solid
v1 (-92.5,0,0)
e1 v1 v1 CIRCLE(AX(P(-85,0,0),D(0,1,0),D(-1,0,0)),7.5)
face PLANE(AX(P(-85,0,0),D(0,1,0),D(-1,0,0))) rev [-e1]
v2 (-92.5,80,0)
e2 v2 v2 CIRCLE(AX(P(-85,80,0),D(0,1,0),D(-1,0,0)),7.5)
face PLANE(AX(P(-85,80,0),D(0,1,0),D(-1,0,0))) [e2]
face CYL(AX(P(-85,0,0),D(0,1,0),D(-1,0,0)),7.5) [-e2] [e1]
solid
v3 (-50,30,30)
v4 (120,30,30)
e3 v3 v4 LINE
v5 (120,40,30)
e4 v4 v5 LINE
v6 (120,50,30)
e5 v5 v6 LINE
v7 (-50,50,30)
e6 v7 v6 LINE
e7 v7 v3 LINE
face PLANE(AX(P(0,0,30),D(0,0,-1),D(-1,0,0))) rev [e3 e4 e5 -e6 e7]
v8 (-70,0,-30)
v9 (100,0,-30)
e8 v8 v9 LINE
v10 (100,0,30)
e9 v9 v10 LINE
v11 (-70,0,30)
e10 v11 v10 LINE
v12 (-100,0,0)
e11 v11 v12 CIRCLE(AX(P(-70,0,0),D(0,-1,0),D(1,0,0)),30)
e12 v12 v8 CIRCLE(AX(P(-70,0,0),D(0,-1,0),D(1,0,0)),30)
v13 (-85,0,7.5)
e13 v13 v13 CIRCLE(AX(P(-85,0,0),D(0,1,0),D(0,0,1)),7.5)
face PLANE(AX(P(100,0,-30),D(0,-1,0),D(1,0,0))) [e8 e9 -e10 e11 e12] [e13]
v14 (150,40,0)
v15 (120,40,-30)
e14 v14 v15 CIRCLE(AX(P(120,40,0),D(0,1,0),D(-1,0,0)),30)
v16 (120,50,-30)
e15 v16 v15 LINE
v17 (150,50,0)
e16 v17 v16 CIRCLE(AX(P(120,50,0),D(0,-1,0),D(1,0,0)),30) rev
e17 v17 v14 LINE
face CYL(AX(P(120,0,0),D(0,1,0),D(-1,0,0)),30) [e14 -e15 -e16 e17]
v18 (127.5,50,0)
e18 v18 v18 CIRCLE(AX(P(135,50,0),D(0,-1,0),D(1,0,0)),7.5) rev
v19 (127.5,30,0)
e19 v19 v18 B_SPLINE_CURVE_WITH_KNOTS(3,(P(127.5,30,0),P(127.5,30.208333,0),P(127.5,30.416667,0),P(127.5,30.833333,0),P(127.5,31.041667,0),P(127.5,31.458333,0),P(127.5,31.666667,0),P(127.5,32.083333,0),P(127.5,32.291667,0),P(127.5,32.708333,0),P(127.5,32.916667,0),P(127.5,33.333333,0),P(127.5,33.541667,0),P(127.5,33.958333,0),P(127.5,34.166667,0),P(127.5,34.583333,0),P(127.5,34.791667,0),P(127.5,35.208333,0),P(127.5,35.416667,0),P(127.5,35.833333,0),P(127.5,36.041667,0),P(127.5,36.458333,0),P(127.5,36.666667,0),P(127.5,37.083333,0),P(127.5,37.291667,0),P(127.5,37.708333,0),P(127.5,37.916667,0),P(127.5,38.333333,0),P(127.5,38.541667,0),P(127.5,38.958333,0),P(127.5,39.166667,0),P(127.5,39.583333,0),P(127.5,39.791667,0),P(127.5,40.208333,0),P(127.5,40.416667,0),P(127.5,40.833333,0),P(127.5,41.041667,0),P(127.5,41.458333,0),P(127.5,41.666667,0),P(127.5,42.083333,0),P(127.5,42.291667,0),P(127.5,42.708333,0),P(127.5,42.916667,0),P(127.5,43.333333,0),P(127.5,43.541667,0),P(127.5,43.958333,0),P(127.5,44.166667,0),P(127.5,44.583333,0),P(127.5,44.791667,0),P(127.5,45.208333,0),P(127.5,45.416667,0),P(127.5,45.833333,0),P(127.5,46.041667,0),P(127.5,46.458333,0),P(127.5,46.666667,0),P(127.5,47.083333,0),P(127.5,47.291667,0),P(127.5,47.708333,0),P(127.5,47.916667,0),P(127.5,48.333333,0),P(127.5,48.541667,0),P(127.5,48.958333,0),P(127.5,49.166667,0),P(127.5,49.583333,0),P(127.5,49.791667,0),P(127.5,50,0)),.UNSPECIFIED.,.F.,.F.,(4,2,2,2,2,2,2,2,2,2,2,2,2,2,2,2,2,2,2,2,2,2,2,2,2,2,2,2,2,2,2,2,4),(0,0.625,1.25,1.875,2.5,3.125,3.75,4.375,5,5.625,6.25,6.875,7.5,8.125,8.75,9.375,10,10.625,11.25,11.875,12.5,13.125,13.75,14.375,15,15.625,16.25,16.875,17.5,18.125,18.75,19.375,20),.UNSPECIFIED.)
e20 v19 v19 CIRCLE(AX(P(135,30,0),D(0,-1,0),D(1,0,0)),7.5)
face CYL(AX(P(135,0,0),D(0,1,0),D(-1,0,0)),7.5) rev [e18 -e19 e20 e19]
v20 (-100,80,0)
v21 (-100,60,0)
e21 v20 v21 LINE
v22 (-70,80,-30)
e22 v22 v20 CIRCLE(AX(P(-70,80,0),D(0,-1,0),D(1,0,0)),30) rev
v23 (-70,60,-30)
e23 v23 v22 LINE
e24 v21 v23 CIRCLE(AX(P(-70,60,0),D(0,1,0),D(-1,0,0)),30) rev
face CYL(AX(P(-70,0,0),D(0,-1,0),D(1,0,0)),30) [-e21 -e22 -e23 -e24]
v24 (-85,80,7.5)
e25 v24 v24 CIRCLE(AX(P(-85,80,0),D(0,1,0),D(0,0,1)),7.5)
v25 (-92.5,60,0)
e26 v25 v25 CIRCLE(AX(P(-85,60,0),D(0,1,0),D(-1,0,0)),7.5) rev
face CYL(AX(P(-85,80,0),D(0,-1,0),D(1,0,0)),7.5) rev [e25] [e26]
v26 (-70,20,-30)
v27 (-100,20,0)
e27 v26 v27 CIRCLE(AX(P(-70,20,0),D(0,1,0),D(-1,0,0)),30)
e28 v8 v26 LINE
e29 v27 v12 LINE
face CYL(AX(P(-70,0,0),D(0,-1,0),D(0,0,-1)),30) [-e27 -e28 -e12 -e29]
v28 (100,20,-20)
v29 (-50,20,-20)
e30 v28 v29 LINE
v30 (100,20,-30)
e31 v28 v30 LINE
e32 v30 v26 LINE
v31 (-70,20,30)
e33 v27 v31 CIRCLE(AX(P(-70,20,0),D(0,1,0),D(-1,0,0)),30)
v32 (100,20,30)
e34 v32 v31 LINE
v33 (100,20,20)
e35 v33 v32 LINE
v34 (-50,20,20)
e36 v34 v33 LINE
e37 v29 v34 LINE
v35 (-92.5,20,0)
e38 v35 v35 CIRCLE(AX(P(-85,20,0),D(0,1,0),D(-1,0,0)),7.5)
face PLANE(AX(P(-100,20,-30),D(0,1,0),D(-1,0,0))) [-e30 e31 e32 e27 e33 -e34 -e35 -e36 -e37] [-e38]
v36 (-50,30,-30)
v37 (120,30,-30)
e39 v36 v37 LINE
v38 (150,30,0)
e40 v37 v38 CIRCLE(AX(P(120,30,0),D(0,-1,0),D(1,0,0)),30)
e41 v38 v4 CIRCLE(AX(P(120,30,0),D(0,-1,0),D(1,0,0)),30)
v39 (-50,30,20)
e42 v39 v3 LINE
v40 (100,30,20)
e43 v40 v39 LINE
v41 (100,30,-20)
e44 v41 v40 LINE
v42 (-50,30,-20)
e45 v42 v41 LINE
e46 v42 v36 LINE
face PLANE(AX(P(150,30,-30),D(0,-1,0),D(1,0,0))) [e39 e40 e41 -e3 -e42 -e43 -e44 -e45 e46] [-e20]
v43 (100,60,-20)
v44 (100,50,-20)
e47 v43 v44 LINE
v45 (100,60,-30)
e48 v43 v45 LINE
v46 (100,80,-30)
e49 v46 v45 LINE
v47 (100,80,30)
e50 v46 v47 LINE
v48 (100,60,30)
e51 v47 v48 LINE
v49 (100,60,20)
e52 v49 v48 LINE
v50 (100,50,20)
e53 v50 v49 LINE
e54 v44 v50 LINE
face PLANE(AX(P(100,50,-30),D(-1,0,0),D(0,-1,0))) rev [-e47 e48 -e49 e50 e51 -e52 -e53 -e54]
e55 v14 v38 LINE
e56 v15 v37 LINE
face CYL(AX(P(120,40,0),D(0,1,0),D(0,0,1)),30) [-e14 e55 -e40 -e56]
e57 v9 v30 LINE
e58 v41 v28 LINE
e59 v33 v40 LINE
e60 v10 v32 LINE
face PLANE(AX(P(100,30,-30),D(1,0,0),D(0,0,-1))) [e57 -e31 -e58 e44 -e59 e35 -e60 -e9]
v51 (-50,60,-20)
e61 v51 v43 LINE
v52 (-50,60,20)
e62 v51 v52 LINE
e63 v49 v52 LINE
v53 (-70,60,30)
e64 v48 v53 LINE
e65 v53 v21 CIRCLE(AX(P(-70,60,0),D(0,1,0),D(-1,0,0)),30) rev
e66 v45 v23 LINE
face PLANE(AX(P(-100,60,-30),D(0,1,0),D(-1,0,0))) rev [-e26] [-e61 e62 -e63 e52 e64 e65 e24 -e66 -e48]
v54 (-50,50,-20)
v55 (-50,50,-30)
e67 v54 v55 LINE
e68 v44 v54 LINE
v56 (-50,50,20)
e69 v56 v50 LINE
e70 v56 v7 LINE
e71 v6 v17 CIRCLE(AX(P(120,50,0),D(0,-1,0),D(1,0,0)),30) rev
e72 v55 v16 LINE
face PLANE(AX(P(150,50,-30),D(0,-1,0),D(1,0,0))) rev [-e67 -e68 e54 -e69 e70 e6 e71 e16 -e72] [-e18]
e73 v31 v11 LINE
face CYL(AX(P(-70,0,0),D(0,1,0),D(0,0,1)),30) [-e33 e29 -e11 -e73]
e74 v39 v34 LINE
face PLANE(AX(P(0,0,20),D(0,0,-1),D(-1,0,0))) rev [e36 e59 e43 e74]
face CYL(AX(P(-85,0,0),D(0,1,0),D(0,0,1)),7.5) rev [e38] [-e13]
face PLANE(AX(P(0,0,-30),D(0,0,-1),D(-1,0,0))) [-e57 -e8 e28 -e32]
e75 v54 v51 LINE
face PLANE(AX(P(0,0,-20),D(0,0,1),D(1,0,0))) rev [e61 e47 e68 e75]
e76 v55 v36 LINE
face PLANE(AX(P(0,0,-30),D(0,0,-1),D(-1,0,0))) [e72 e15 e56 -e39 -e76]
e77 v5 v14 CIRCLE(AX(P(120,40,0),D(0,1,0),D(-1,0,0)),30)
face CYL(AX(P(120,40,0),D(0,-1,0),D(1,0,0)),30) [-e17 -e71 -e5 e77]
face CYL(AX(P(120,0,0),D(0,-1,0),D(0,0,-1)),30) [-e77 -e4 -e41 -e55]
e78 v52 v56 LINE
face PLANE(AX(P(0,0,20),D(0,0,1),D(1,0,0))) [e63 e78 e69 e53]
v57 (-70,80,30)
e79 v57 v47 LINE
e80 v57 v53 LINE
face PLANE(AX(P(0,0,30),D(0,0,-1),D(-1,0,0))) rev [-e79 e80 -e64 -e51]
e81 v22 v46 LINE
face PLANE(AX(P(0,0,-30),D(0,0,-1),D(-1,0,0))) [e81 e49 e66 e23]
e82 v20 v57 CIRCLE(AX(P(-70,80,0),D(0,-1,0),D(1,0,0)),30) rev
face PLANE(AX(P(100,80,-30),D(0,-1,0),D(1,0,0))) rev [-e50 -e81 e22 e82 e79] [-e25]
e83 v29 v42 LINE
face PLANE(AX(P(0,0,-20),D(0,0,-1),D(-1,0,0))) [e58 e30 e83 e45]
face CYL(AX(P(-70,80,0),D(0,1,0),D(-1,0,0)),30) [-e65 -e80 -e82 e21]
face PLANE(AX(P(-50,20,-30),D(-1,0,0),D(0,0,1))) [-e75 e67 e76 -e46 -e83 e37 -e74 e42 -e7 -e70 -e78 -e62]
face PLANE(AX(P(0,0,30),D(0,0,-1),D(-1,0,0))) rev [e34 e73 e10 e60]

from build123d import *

# Parameters (mm, degrees)
BOSS_EXTRUDE1_DEPTH      = 30
SKETCH2_R                = 7.5
CUT_EXTRUDE1_DEPTH       = 159.113883008
FILLET6_R                = 30
FILLET7_R                = 30
SKETCH3_R                = 7.5
CUT_EXTRUDE2_DEPTH       = 155.272486205
FILLET8_R                = 30
FILLET9_R                = 30
FILLET6_OF_MIRROR1_R     = 30
FILLET7_OF_MIRROR1_R     = 30
FILLET8_OF_MIRROR1_R     = 30
FILLET9_OF_MIRROR1_R     = 30
SKETCH16_W               = 150
SKETCH16_H               = 10
CUT_EXTRUDE11_DEPTH      = 10
SKETCH17_W               = 150
SKETCH17_H               = 10
CUT_EXTRUDE12_DEPTH      = 10
SKETCH18_W               = 150
SKETCH18_H               = 10
CUT_EXTRUDE13_DEPTH      = 10
SKETCH19_W               = 150
SKETCH19_H               = 10
CUT_EXTRUDE14_DEPTH      = 10
BOSS_EXTRUDE2_DEPTH      = 60
BOSS_EXTRUDE2_DEPTH_BACK = 20
SKETCH21_R               = 7.5


with BuildPart() as part:
    # Sketch1 → Boss-Extrude1 (new, symmetric)
    with BuildSketch(Plane.XY):
        Polygon((-100, 0), (-100, 20), (-50, 20), (-50, 40), (150, 40), (150, 30), (100, 30), (100, 0), align=None)
    boss_extrude1 = extrude(amount=BOSS_EXTRUDE1_DEPTH, both=True)

    # Sketch2 → Cut-Extrude1 (cut, symmetric)
    with BuildSketch(Plane(origin=(0, 40, 0), x_dir=(1, 0, 0), z_dir=(0, 1, 0))):
        with Locations(Location((135, 0, 0), (0, 0, 180))):
            Circle(SKETCH2_R)
    cut_extrude1 = extrude(amount=CUT_EXTRUDE1_DEPTH, both=True, mode=Mode.SUBTRACT)

    # Fillet6
    fillet6_edges = [part.edges().sort_by_distance(p)[0] for p in [
        (150, 35, 30),
    ]]
    fillet(fillet6_edges, radius=FILLET6_R)

    # Fillet7
    fillet7_edges = [part.edges().sort_by_distance(p)[0] for p in [
        (150, 35, -30),
    ]]
    fillet(fillet7_edges, radius=FILLET7_R - 0.0001)  # a hair under: the kernel refuses the full size

    # Sketch3 → Cut-Extrude2 (cut, symmetric)
    with BuildSketch(Plane(origin=(0, 20, 0), x_dir=(1, 0, 0), z_dir=(0, 1, 0))):
        with Locations(Location((-85, 0, 0), (0, 0, 270))):
            Circle(SKETCH3_R)
    cut_extrude2 = extrude(amount=CUT_EXTRUDE2_DEPTH, both=True, mode=Mode.SUBTRACT)

    # Fillet8
    fillet8_edges = [part.edges().sort_by_distance(p)[0] for p in [
        (-100, 10, -30),
    ]]
    fillet(fillet8_edges, radius=FILLET8_R)

    # Fillet9
    fillet9_edges = [part.edges().sort_by_distance(p)[0] for p in [
        (-100, 10, 30),
    ]]
    fillet(fillet9_edges, radius=FILLET9_R - 0.0001)  # a hair under: the kernel refuses the full size

    # Mirror1: Boss-Extrude1, Cut-Extrude1, Cut-Extrude2 across plane
    add(boss_extrude1.mirror(Plane(origin=(-50, 40, -30), x_dir=(0, 0, 1), z_dir=(0, 1, 0))))
    add(cut_extrude1.mirror(Plane(origin=(-50, 40, -30), x_dir=(0, 0, 1), z_dir=(0, 1, 0))), mode=Mode.SUBTRACT)
    add(cut_extrude2.mirror(Plane(origin=(-50, 40, -30), x_dir=(0, 0, 1), z_dir=(0, 1, 0))), mode=Mode.SUBTRACT)

    # Fillet6 of Mirror1
    fillet6_of_mirror1_edges = [part.edges().sort_by_distance(p)[0] for p in [
        (150, 45, 30),
    ]]
    fillet(fillet6_of_mirror1_edges, radius=FILLET6_OF_MIRROR1_R)

    # Fillet7 of Mirror1
    fillet7_of_mirror1_edges = [part.edges().sort_by_distance(p)[0] for p in [
        (150, 45, -30),
    ]]
    fillet(fillet7_of_mirror1_edges, radius=FILLET7_OF_MIRROR1_R - 0.0001)  # a hair under: the kernel refuses the full size

    # Fillet8 of Mirror1
    fillet8_of_mirror1_edges = [part.edges().sort_by_distance(p)[0] for p in [
        (-100, 70, -30),
    ]]
    fillet(fillet8_of_mirror1_edges, radius=FILLET8_OF_MIRROR1_R)

    # Fillet9 of Mirror1
    fillet9_of_mirror1_edges = [part.edges().sort_by_distance(p)[0] for p in [
        (-100, 70, 30),
    ]]
    fillet(fillet9_of_mirror1_edges, radius=FILLET9_OF_MIRROR1_R - 0.0001)  # a hair under: the kernel refuses the full size

    # Sketch16 → Cut-Extrude11 (cut)
    with BuildSketch(Plane(origin=(0, 0, -30), x_dir=(-1, 0, 0), z_dir=(0, 0, -1))):
        with Locations((-25, 25)):
            Rectangle(SKETCH16_W, SKETCH16_H)
    extrude(amount=-CUT_EXTRUDE11_DEPTH, mode=Mode.SUBTRACT)

    # Sketch17 → Cut-Extrude12 (cut)
    with BuildSketch(Plane(origin=(0, 0, -30), x_dir=(-1, 0, 0), z_dir=(0, 0, -1))):
        with Locations((-25, 55)):
            Rectangle(SKETCH17_W, SKETCH17_H)
    extrude(amount=-CUT_EXTRUDE12_DEPTH, mode=Mode.SUBTRACT)

    # Sketch18 → Cut-Extrude13 (cut)
    with BuildSketch(Plane.XY.offset(30)):
        with Locations((25, 55)):
            Rectangle(SKETCH18_W, SKETCH18_H)
    extrude(amount=-CUT_EXTRUDE13_DEPTH, mode=Mode.SUBTRACT)

    # Sketch19 → Cut-Extrude14 (cut)
    with BuildSketch(Plane.XY.offset(30)):
        with Locations((25, 25)):
            Rectangle(SKETCH19_W, SKETCH19_H)
    extrude(amount=-CUT_EXTRUDE14_DEPTH, mode=Mode.SUBTRACT)


with BuildPart() as body_2:
    # Sketch21 → Boss-Extrude2 (new, two sides: drawn at the far end of the back side and taken through both)
    with BuildSketch(Plane(origin=(0, 20, 0), x_dir=(1, 0, 0), z_dir=(0, 1, 0)).offset(-BOSS_EXTRUDE2_DEPTH_BACK)):
        with Locations(Location((-85, 0, 0), (0, 0, 180))):
            Circle(SKETCH21_R)
    extrude(amount=BOSS_EXTRUDE2_DEPTH + BOSS_EXTRUDE2_DEPTH_BACK)


solid = Compound([part.part, body_2.part])
